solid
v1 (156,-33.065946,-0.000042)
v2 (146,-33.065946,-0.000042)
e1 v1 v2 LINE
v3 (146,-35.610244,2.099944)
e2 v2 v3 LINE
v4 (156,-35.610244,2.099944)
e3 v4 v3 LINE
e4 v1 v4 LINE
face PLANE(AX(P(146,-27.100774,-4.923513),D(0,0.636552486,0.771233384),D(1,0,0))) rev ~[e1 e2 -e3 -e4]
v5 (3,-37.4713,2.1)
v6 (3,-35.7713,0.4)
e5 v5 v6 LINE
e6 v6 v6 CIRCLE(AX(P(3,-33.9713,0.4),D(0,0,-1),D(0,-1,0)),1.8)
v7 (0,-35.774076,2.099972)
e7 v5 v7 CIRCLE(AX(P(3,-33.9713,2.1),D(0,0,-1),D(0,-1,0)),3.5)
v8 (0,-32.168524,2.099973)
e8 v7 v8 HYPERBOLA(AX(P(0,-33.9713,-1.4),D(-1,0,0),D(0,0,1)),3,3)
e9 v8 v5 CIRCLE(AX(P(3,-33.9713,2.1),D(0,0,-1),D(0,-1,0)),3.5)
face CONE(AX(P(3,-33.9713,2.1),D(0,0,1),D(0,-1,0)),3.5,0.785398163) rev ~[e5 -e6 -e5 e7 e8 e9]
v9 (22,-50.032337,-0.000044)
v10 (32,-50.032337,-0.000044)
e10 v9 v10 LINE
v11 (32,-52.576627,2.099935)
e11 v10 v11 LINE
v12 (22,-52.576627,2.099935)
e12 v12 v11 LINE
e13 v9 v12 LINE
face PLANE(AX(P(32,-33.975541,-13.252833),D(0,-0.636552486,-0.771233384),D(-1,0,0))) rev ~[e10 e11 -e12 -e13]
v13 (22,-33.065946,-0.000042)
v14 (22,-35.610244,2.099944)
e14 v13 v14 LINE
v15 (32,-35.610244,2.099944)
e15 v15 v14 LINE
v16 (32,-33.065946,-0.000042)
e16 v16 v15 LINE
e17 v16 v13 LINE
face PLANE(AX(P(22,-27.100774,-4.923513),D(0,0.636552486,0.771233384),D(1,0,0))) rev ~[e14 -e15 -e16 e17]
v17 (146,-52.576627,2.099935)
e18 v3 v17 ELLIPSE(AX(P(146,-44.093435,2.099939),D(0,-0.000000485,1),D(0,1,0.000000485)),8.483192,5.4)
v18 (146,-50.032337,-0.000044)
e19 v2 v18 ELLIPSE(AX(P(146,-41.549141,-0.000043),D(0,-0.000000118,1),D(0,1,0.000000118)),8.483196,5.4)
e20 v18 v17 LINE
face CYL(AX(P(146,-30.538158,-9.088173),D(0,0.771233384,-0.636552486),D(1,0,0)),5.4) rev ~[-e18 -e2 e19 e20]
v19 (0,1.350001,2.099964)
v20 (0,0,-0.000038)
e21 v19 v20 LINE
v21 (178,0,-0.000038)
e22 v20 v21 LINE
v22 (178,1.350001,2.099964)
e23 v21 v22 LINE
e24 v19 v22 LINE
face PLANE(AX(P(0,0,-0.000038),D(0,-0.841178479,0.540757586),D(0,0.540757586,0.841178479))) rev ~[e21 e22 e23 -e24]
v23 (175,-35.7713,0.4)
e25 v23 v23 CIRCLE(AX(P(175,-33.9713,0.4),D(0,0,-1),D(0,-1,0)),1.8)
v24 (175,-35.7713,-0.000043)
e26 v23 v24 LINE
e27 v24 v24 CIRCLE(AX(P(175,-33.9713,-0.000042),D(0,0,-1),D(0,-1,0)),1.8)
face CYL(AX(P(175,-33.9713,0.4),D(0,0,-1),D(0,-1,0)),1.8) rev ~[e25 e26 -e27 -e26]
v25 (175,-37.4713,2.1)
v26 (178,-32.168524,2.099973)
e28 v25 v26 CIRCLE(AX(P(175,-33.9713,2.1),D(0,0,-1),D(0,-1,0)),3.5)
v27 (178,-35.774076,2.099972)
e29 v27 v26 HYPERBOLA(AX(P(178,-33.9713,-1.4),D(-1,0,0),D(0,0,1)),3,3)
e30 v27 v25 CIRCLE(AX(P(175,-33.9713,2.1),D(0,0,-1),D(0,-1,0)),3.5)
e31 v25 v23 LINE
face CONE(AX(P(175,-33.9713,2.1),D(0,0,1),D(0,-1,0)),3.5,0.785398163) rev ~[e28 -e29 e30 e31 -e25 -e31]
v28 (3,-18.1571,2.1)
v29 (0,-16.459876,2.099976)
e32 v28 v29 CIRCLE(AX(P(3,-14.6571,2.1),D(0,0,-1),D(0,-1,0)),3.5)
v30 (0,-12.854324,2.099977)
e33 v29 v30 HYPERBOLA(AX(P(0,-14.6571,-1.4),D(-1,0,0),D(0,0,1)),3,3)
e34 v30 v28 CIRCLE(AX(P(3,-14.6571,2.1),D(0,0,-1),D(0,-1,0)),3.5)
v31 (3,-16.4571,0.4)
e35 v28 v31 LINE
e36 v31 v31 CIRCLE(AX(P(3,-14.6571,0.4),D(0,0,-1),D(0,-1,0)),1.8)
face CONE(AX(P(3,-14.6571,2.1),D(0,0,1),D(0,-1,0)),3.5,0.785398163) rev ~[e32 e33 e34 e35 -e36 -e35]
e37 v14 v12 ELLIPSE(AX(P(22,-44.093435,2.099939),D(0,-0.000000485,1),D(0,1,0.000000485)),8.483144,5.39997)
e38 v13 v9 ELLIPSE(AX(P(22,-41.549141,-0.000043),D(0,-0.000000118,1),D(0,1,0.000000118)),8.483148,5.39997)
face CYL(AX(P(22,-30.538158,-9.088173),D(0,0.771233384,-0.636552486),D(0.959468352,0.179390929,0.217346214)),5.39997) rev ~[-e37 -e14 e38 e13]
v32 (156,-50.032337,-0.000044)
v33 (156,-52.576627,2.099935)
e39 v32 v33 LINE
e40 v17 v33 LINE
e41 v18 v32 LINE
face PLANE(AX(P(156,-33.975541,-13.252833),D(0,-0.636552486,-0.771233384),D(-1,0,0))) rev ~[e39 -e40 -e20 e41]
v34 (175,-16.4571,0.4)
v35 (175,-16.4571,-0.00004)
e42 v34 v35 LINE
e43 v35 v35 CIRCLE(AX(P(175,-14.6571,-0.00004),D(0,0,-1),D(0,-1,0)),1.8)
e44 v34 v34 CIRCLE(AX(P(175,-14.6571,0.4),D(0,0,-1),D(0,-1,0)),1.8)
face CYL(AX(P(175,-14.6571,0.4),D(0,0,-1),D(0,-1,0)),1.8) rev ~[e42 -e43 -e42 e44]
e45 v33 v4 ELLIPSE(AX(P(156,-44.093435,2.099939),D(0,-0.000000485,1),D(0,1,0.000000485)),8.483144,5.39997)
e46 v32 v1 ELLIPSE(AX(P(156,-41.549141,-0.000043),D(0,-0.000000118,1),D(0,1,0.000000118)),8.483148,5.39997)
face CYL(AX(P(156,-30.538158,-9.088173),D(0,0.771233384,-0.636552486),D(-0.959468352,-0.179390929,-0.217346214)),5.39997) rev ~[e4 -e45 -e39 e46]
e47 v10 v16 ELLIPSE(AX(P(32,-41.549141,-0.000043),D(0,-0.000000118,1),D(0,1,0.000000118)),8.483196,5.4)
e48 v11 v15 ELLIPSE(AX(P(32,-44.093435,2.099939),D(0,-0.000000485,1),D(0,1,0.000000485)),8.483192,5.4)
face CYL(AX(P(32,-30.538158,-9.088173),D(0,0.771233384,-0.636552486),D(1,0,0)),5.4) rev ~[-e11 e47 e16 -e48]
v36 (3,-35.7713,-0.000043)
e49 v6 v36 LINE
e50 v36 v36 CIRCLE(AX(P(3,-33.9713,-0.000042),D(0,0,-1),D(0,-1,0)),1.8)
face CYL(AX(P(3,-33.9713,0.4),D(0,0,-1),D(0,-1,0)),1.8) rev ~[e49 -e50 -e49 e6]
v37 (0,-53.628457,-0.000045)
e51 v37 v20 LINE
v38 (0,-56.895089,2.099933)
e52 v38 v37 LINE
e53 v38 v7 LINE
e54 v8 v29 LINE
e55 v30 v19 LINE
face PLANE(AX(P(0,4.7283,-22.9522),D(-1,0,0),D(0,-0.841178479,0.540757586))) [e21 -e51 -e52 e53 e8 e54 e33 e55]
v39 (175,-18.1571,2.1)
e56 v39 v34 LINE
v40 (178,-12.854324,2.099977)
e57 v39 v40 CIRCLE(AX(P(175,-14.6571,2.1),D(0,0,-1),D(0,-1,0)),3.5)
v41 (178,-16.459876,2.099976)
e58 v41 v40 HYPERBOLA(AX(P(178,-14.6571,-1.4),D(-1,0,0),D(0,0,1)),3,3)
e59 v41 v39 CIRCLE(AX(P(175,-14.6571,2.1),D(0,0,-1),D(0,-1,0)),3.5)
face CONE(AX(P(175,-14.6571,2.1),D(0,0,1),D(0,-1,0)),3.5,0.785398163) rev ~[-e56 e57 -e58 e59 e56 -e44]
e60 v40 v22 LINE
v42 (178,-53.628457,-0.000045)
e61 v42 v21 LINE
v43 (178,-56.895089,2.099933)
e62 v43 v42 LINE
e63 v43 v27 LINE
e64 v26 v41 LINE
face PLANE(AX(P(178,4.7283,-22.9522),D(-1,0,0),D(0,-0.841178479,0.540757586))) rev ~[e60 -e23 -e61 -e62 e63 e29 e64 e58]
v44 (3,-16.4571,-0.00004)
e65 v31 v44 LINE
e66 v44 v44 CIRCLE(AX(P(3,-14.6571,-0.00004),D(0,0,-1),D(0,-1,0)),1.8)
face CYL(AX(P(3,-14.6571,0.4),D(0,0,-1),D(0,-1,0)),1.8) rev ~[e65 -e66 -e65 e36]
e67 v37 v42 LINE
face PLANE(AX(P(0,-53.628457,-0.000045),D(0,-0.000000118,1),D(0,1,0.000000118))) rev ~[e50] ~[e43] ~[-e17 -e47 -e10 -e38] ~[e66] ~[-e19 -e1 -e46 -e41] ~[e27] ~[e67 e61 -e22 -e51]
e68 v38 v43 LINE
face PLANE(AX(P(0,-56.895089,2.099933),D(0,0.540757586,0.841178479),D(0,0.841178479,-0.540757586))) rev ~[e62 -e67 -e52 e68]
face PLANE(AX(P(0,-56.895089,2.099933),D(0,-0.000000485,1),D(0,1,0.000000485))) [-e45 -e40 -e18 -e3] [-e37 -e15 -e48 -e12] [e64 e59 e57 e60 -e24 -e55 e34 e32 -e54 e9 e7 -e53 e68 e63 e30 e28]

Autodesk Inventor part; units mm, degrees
ref_plane "YZ Plane" through (0, 0, 0) normal (1, 0, 0) x (0, 1, 0)
ref_plane "XZ Plane" through (0, 0, 0) normal (0, 1, 0) x (-1, 0, 0)
ref_plane "Work Plane1" through (0, 4.7283, -22.9522) normal (-1, 0, 0) x (0, -0.8411785, 0.5407576)
sketch "Sketch1" plane through (0, 4.7283, -22.9522) normal (-1, 0, 0) x (0, -0.8411785, 0.5407576)
  line L0 (-34.301, -16.75) -> (61.5, -16.75) projected
  line L1 (61.5, -16.75) -> (61.5, -12.25) projected
  line L2 (61.5, -12.25) -> (16.3889, 16.75) projected
  line L3 (16.3889, 16.75) -> (-61.5, 16.75) projected
  line L4 (-61.5, 16.75) -> (-61.5, -12.801) projected
  line L5 (61.5, -12.25) -> (61.5, -16.75) projected
  line L6 (61.5, -16.75) -> (65.5, -16.75) projected
  line L7 (65.5, -16.75) -> (65.5, -20.25) projected
  line L8 (65.5, -20.25) -> (79.5, -20.25) projected
  line L9 (79.5, -20.25) -> (65.5, -11.25) projected
  line L10 (65.5, -11.25) -> (65.5, -12.25) projected
  line L11 (65.5, -12.25) -> (61.5, -12.25) projected
  line L12 (16.3889, 16.75) -> (16.3889, 18.75) projected
  line L13 (14.3494, 18.75) -> (16.3889, 18.75) projected
  line L14 (65.3834, -12.25) -> (12.6747, 21.6342)
  line L15 (16.3889, 16.75) -> (16.3889, 19.2465)
  arc A0 (-57.551, -16.75) -> (-61.5, -12.801) centre (-58.75, -14) ccw projected
  line L16 (-57.551, -16.75) -> (-36.699, -16.75) projected
  arc A1 (-34.301, -16.75) -> (-36.699, -16.75) centre (-35.5, -14) ccw projected
  dimension "d13" = 2.1
ref_plane "Work Plane2" through (178, -56.0619, -70.2985) normal (1, 0, 0) x (0, 0.8411785, -0.5407576)
extrude "Extrusion1" add sketch "Sketch1" against normal up to surface (178 mm away) contours L2 L12 L15 L14 L11
sketch "Sketch2" plane through (0, -56.8951, 2.1) normal (0, 0, 1) x (1, 0, 0)
  circle A0 centre (3, 22.9238) radius 2.5 projected
  circle A1 centre (3, 42.238) radius 2.5 projected
  line L0 (0, 3.2667) -> (0, 56.8951) projected
  line L1 (0, 3.2667) -> (6, 3.2667) projected
  line L2 (6, 56.8951) -> (6, 3.2667) projected
  line L3 (0, 56.8951) -> (6, 56.8951) projected
  circle A2 centre (175, 22.9238) radius 2.5 projected
  circle A3 centre (175, 42.238) radius 2.5 projected
  line L4 (178, 3.2667) -> (178, 56.8951) projected
  line L5 (178, 56.8951) -> (172, 56.8951) projected
  line L6 (172, 56.8951) -> (172, 3.2667) projected
  line L7 (178, 3.2667) -> (172, 3.2667) projected
hole "Hole1" at (3, -14.6571, 2.1) at (3, -33.9713, 2.1) at (175, -33.9713, 2.1) at (175, -14.6571, 2.1) direction (0, 0, -1) diameter 3.6 end through all countersink diameter 7 countersink angle 90 clearance for "Countersunk Flat Head Screw ISO 2009/7046" size "M3" standard "ISO"
ref_plane "Work Plane3" through (22, -30.5397, -9.0869) normal (0, -0.7712334, 0.6365525) x (1, 0, 0)
sketch "Sketch3" plane through (22, -30.5397, -9.0869) normal (0, -0.7712334, 0.6365525) x (1, 0, 0)
  line L0 (-9.9215, 5.4518) -> (-9.9215, -5.4534)
  spline S0 degree 3 poles (-9.9215, -5.4534) (-9.9222, -5.5772) (-9.8204, -5.8209) (-9.5772, -5.9222) (-9.4534, -5.9215) knots 0 0 0 0 0.5 1 1 1 1
  line L1 (-9.4534, -5.9215) -> (19.4534, -5.9215)
  spline S1 degree 3 poles (19.4534, -5.9215) (19.5775, -5.9222) (19.8219, -5.82) (19.9222, -5.5758) (19.9215, -5.4518) knots 0 0 0 0 0.5 1 1 1 1
  line L2 (19.9215, -5.4518) -> (19.9215, 5.4534)
  spline S2 degree 3 poles (19.9215, 5.4534) (19.9222, 5.5775) (19.82, 5.8219) (19.5758, 5.9222) (19.4518, 5.9215) knots 0 0 0 0 0.5 1 1 1 1
  line L3 (19.4518, 5.9215) -> (-9.4534, 5.9215)
  spline S3 degree 3 poles (-9.4534, 5.9215) (-9.5775, 5.9222) (-9.8219, 5.82) (-9.9222, 5.5758) (-9.9215, 5.4518) knots 0 0 0 0 0.5 1 1 1 1
  circle A0 centre (-8.3791, -4.3791) radius 0.5
  circle A1 centre (-8.3791, 4.3791) radius 0.5
  circle A2 centre (18.3791, 4.3791) radius 0.5
  circle A3 centre (18.3791, -4.3791) radius 0.5
  arc A4 (5.2617, -1.4512) -> (5.1811, -1.5218) centre (5.2771, -1.55) ccw
  arc A5 (5.1811, 1.5218) -> (5.1811, -1.5218) centre (0, 0) ccw
  arc A6 (5.1811, 1.5218) -> (5.2617, 1.4512) centre (5.2771, 1.55) ccw
  arc A7 (5.2617, 1.4512) -> (5.3414, 1.519) centre (5.2463, 1.55) ccw
  arc A8 (5.3414, -1.519) -> (5.3414, 1.519) centre (10, 0) ccw
  arc A9 (5.3414, -1.519) -> (5.2617, -1.4512) centre (5.2463, -1.55) ccw
  line L4 (143.9215, 5.4518) -> (143.9215, -5.4534)
  spline S4 degree 3 poles (143.4534, 5.9215) (143.5775, 5.9222) (143.8219, 5.82) (143.9222, 5.5758) (143.9215, 5.4518) knots 0 0 0 0 0.5 1 1 1 1
  line L5 (114.5482, 5.9215) -> (143.4534, 5.9215)
  spline S5 degree 3 poles (114.0785, 5.4534) (114.0778, 5.5775) (114.18, 5.8219) (114.4242, 5.9222) (114.5482, 5.9215) knots 0 0 0 0 0.5 1 1 1 1
  line L6 (114.0785, -5.4518) -> (114.0785, 5.4534)
  spline S6 degree 3 poles (114.5466, -5.9215) (114.4225, -5.9222) (114.1781, -5.82) (114.0778, -5.5758) (114.0785, -5.4518) knots 0 0 0 0 0.5 1 1 1 1
  line L7 (143.4534, -5.9215) -> (114.5466, -5.9215)
  spline S7 degree 3 poles (143.9215, -5.4534) (143.9222, -5.5772) (143.8204, -5.8209) (143.5772, -5.9222) (143.4534, -5.9215) knots 0 0 0 0 0.5 1 1 1 1
  circle A10 centre (142.3791, -4.3791) radius 0.5
  circle A11 centre (142.3791, 4.3791) radius 0.5
  circle A12 centre (115.6209, 4.3791) radius 0.5
  circle A13 centre (115.6209, -4.3791) radius 0.5
  arc A14 (128.8189, -1.5218) -> (128.7383, -1.4512) centre (128.7229, -1.55) ccw
  arc A15 (128.7383, -1.4512) -> (128.6586, -1.519) centre (128.7537, -1.55) ccw
  arc A16 (128.6586, 1.519) -> (128.6586, -1.519) centre (124, 0) ccw
  arc A17 (128.6586, 1.519) -> (128.7383, 1.4512) centre (128.7537, 1.55) ccw
  arc A18 (128.7383, 1.4512) -> (128.8189, 1.5218) centre (128.7229, 1.55) ccw
  arc A19 (128.8189, -1.5218) -> (128.8189, 1.5218) centre (134, 0) ccw
  circle A20 centre (10, 0) radius 5.4
  circle A21 centre (124, 0) radius 5.4
  line L8 (0, 5.4) -> (10, 5.4)
  line L9 (10, -5.4) -> (0, -5.4)
  line L10 (124, 5.4) -> (134, 5.4)
  line L11 (134, -5.4) -> (124, -5.4)
  point P0 (-22, 26.4483)
  dimension "d9" = 10.8
  dimension "d10" = 10.8
extrude "Extrusion2" cut sketch "Sketch3" along normal blind 78.25 contours A9 A8 A7 A6 A5 A20 A4 | A4 A5 A20 A6 A7 A8 A9 | A20 L9 A5 | A5 A20 | A5 L8 A20 | A19 A21 A18 A17 A16 A15 A14 | A14 A15 A16 A17 A18 A19 A21 | A21 A19 | A19 L11 A21 | A19 A21 L10
properties part number "front"
